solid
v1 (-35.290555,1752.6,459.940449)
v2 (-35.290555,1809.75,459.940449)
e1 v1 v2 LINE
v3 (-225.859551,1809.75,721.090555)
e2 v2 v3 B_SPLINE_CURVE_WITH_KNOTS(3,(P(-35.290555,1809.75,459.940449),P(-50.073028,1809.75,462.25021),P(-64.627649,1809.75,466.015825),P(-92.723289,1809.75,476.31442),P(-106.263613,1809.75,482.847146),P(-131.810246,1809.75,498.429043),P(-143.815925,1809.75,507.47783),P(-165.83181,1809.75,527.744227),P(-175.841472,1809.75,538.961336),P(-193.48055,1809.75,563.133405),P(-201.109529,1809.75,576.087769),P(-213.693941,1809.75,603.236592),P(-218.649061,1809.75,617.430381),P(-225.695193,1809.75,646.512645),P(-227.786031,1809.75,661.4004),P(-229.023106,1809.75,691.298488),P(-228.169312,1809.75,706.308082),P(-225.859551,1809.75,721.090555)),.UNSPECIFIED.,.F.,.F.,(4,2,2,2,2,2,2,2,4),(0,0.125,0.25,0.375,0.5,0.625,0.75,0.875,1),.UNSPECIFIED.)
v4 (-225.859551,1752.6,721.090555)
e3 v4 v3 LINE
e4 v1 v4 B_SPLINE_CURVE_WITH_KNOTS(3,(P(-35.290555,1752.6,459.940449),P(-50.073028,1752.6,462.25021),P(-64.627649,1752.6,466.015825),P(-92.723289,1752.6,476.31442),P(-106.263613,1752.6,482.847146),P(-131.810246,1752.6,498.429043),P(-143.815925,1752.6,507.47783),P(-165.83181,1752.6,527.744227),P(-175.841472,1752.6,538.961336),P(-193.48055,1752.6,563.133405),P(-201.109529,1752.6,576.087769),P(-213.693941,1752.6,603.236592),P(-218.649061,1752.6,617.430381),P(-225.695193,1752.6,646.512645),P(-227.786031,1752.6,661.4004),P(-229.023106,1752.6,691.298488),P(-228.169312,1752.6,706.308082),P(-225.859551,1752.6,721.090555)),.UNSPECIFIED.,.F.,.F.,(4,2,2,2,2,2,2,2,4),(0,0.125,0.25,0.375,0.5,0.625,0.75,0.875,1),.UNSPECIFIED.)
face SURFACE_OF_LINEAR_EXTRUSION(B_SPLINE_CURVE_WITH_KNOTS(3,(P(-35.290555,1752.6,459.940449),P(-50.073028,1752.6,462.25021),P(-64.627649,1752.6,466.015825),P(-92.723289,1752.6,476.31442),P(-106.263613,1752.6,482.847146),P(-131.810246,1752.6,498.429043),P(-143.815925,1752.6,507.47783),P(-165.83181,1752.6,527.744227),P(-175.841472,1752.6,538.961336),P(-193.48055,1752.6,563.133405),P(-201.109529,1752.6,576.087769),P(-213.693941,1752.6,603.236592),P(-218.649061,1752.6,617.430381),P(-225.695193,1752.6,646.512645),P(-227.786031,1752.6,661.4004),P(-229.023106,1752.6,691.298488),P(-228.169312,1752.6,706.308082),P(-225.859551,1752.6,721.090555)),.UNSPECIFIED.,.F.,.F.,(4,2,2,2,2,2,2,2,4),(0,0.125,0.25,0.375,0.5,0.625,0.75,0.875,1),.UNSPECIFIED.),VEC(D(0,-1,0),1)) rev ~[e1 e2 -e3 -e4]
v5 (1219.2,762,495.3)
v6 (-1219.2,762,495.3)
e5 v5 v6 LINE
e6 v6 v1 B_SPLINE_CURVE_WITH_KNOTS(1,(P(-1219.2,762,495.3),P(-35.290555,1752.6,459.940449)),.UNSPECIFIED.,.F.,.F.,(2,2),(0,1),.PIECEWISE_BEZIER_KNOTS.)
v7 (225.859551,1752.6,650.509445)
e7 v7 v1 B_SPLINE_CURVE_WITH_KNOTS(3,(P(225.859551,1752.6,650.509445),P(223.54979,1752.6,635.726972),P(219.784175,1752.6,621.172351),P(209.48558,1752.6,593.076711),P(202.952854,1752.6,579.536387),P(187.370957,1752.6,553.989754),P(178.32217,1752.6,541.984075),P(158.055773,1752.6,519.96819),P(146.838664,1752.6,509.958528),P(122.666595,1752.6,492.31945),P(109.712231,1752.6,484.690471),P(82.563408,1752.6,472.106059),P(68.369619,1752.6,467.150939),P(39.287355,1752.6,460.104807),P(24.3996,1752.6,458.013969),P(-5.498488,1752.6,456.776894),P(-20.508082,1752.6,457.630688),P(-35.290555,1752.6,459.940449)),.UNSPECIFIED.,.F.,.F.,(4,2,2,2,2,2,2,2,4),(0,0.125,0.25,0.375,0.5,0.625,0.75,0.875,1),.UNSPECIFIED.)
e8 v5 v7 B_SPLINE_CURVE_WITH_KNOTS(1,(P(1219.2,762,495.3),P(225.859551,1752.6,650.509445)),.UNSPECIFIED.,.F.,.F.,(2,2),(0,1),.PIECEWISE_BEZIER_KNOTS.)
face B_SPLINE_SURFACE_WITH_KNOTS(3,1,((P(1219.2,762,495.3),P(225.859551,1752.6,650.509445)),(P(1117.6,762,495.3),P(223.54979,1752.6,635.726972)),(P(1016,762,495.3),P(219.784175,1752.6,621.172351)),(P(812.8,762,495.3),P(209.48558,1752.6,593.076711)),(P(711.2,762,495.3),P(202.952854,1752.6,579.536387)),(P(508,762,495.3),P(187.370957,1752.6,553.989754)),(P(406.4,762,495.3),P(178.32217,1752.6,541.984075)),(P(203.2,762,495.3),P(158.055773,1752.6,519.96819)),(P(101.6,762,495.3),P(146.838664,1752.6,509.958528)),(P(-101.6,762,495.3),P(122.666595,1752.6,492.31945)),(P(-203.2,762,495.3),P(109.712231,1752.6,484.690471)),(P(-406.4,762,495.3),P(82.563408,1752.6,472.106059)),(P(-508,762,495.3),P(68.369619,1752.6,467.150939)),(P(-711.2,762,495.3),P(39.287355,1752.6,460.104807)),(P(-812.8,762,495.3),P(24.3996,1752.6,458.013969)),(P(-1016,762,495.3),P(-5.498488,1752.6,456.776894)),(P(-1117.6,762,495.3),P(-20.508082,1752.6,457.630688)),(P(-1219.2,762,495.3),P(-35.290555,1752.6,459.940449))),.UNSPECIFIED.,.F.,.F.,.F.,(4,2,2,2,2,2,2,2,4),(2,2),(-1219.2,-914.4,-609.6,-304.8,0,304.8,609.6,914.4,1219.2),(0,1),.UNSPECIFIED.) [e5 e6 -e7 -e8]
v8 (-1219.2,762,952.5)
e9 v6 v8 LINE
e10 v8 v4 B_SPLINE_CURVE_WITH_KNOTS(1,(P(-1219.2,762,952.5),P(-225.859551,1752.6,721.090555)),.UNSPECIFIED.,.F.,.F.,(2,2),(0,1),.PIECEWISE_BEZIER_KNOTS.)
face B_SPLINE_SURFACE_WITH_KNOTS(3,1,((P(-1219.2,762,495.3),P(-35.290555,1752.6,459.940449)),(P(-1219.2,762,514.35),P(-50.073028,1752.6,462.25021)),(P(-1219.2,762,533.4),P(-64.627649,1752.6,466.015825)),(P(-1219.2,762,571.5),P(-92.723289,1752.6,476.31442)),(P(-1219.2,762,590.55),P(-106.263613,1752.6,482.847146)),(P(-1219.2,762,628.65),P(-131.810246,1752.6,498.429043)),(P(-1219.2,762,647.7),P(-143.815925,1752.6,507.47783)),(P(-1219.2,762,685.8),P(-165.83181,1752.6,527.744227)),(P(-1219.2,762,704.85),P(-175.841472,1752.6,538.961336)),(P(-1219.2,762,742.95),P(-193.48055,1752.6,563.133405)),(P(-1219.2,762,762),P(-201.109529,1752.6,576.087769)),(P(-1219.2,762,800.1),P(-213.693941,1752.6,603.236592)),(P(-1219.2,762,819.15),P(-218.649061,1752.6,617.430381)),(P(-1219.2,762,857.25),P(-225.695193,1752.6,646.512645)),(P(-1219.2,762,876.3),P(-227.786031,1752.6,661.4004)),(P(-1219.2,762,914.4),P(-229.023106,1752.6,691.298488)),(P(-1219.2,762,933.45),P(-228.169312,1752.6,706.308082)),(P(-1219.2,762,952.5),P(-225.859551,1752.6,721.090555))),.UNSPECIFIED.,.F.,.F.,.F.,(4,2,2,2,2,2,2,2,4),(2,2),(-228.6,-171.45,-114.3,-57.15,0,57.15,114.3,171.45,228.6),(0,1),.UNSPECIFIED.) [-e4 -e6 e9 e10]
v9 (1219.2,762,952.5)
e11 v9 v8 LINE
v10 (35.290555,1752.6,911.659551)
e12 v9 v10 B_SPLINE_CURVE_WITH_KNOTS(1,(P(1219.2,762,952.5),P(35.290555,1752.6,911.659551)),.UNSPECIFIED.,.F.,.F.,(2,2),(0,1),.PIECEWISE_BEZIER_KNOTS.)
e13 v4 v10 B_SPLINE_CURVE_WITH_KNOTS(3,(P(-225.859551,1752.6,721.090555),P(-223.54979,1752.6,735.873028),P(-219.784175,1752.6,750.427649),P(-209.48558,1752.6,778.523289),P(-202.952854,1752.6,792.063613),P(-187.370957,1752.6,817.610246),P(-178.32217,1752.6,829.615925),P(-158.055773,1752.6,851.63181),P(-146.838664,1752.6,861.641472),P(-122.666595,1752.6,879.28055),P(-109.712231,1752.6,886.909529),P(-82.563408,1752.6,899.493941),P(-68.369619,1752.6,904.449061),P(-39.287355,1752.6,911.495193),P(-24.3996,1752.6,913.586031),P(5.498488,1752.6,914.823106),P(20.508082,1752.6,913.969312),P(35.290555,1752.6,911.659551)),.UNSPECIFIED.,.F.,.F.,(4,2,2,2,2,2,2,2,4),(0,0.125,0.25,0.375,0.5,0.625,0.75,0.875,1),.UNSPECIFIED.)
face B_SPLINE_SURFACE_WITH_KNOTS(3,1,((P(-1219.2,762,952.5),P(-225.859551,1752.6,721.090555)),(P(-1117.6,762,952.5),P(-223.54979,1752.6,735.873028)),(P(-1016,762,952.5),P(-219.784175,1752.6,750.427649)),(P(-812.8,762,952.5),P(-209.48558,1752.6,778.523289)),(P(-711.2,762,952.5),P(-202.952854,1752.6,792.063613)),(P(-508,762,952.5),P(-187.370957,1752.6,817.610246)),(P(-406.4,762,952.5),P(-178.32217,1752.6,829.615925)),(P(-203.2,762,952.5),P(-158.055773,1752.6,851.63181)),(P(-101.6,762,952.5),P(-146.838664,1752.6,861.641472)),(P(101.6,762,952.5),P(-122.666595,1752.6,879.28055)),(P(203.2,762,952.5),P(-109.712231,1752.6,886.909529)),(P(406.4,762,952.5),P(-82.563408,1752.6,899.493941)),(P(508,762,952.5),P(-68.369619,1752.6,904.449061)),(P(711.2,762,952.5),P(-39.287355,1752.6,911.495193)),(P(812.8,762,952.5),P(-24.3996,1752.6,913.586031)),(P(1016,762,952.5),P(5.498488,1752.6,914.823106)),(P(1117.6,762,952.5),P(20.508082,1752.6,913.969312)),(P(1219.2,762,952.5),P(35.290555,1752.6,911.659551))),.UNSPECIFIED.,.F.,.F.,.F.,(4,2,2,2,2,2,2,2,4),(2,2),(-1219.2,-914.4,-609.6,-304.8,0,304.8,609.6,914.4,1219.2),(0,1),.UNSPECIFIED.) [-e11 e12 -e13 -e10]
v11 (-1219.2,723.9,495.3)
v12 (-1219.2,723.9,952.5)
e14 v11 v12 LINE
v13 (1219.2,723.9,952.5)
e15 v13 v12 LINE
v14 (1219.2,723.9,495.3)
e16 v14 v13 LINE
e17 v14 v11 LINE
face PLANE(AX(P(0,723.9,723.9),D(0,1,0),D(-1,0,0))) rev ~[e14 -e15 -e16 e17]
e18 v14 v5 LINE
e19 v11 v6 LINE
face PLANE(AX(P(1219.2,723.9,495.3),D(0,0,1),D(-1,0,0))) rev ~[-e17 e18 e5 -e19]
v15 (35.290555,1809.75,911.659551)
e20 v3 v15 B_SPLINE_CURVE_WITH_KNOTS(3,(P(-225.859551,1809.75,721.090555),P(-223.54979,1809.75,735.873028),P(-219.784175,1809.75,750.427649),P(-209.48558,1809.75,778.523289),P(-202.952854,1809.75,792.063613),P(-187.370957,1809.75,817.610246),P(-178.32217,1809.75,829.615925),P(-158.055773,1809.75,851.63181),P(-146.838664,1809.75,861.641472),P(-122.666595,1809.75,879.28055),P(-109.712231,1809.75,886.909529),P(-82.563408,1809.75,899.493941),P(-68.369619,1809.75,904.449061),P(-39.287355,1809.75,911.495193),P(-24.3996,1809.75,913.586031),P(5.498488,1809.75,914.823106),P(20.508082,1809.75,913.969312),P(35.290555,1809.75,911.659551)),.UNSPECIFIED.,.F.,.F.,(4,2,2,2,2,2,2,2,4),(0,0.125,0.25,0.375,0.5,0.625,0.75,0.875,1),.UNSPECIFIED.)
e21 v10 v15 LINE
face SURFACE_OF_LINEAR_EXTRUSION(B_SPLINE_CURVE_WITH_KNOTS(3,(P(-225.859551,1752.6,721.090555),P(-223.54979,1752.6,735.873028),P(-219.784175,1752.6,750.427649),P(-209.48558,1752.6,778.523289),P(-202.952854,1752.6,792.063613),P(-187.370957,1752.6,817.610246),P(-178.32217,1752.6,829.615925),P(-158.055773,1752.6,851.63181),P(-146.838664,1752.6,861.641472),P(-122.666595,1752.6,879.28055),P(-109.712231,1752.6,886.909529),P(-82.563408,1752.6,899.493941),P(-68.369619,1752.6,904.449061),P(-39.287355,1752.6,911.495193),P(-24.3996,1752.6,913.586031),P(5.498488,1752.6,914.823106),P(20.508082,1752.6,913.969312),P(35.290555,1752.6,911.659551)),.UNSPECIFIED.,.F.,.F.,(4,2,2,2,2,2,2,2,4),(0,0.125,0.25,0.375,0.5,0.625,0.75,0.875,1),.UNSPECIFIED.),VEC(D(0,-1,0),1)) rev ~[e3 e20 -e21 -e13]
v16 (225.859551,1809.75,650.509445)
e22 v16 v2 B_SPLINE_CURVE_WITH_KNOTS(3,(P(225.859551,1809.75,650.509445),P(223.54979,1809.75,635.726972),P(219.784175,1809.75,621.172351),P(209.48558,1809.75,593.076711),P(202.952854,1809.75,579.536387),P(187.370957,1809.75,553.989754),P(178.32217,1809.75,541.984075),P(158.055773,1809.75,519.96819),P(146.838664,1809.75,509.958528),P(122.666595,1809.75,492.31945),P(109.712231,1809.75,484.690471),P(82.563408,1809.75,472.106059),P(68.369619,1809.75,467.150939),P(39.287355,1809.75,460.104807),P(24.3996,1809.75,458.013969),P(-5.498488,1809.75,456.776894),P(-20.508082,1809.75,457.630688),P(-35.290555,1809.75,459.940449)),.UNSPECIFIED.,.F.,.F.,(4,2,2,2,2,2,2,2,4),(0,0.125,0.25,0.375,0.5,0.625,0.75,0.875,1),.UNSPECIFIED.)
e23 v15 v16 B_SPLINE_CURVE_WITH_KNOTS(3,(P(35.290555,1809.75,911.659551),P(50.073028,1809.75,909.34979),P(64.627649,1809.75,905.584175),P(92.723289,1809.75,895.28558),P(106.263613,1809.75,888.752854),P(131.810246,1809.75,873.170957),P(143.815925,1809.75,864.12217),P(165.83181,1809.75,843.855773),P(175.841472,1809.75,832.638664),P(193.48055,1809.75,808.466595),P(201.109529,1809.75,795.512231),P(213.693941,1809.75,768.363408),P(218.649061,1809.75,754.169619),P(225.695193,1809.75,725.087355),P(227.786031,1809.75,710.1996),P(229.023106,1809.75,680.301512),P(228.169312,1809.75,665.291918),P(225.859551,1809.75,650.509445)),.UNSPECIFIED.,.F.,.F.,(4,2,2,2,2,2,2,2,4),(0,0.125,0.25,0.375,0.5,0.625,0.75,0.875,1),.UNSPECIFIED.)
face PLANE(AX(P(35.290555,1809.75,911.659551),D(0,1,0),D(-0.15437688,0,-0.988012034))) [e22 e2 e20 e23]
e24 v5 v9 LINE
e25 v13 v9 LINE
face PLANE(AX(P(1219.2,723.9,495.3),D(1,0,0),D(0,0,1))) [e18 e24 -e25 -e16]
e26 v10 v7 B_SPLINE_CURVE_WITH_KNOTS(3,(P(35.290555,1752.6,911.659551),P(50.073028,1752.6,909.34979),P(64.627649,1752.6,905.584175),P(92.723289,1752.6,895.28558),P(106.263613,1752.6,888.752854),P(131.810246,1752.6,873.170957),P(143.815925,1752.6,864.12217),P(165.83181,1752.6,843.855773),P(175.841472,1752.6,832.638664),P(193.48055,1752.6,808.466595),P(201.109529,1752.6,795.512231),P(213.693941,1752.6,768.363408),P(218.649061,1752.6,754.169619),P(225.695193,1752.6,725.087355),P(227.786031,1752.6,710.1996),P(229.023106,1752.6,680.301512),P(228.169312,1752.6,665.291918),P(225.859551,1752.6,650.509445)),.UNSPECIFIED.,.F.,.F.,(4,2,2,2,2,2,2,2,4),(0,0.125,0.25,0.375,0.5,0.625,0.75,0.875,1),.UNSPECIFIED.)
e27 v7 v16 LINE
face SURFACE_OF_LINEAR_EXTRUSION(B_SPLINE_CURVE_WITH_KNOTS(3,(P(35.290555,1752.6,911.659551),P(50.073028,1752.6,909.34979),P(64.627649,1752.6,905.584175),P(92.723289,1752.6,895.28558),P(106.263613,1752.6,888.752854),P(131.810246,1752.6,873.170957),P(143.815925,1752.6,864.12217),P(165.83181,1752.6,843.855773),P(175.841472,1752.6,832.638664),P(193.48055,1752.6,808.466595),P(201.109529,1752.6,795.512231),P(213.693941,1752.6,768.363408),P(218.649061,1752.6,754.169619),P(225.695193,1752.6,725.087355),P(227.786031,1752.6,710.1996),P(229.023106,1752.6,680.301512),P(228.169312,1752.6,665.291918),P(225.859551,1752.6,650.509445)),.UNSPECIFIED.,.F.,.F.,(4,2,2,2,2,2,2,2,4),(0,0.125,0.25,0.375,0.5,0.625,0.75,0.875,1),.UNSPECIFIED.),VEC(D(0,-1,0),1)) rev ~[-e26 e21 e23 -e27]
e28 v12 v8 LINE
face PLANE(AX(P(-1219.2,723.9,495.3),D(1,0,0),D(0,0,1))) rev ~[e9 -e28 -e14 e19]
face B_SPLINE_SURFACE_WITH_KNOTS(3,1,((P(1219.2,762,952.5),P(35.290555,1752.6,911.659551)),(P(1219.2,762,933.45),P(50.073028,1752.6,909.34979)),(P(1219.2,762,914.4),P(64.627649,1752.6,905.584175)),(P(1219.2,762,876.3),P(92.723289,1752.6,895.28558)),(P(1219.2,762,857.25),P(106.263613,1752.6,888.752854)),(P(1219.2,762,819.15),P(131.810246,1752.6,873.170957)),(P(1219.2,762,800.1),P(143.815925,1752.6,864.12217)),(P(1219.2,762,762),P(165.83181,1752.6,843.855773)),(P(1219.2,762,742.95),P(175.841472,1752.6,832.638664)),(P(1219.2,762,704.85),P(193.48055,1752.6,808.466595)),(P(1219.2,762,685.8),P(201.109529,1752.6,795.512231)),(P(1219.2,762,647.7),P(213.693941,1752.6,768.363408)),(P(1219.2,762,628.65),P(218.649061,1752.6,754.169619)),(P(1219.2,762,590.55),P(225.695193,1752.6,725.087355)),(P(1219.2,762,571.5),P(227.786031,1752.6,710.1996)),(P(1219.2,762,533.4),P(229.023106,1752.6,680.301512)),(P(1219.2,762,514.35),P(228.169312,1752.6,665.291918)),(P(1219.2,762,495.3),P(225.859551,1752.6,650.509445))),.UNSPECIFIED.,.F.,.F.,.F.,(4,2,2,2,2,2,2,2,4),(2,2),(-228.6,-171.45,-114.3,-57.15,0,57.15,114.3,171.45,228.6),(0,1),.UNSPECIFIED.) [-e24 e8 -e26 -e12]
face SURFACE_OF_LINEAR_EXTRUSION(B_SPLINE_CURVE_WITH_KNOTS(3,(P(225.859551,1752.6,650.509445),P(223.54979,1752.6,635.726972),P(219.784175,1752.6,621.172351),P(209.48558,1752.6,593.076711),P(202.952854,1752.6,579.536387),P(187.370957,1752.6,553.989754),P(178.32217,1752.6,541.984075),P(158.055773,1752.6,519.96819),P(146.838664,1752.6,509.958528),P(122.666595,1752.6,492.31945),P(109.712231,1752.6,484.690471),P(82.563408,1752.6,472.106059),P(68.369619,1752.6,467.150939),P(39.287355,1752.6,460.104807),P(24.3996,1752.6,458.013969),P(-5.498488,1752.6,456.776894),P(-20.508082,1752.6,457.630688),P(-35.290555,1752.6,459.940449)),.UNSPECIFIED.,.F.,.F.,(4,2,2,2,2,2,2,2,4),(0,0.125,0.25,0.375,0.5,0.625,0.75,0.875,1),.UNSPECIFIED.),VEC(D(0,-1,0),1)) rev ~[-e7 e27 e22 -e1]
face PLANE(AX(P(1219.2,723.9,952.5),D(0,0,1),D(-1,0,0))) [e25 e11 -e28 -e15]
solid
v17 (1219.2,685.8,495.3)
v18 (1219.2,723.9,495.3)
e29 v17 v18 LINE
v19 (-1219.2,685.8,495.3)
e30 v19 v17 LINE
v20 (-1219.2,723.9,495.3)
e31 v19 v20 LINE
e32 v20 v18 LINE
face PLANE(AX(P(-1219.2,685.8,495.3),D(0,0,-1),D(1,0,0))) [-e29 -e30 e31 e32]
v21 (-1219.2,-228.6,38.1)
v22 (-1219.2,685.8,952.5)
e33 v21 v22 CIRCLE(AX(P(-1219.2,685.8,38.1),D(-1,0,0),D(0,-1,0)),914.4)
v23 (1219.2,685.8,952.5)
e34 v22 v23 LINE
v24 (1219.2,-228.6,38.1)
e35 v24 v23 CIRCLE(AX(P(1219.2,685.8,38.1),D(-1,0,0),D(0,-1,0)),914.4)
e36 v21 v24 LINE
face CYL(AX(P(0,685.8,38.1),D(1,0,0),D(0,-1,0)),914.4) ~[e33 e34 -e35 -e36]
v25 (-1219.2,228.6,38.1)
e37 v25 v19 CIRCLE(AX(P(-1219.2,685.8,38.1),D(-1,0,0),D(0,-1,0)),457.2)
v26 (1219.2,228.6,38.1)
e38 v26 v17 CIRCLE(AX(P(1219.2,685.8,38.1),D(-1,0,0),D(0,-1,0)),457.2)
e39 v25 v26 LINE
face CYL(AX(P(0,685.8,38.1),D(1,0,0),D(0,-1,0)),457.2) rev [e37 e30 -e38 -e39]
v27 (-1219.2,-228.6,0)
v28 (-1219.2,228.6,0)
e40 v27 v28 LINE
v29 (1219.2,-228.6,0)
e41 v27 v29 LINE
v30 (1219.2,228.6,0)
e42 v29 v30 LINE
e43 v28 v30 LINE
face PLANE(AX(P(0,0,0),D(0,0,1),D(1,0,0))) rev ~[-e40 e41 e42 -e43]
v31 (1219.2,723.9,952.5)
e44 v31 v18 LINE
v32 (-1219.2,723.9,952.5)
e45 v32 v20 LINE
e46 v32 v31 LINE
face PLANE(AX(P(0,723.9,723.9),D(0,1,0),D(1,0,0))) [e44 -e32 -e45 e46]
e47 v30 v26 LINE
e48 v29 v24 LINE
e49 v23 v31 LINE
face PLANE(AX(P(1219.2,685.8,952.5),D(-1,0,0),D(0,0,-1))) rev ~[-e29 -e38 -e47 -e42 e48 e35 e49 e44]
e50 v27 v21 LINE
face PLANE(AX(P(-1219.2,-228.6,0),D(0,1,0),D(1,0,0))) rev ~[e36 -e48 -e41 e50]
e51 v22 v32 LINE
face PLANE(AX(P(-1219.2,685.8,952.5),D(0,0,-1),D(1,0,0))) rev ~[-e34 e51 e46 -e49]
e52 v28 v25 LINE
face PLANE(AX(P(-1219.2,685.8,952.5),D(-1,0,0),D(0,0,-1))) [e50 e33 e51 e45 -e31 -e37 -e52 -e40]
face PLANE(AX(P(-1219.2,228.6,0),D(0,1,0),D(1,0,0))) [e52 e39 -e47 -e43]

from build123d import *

# Parameters (mm, degrees)
F0_W      = 2438.4
F0_H      = 457.2
F1_DEPTH  = 38.1
F2_W      = 2438.4
F2_H      = 457.2
F3_ANGLE  = 90
F4_DEPTH  = 38.1
F5_W      = 2438.4
F5_H      = 457.2
F6_DEPTH  = 38.1
F6_FACE_W = 2438.4
F6_FACE_H = 457.2
F10_DEPTH = 57.15


# Not quite as in the source:
# - the arcs of a loft's sections are written as splines that run evenly, so that the points pair up as in the source's solid


with BuildPart() as f1:
    # F0 (on Top) → F1 (new body)
    with BuildSketch(Plane.XY):
        Rectangle(F0_W, F0_H)
    extrude(amount=F1_DEPTH)

    # F2 (on face) → F3 (revolve)
    with BuildSketch(Plane.XY.offset(38.1)):
        Rectangle(F2_W, F2_H)
    revolve(axis=Axis((-103.2055318356, 685.8, 38.1), (-1, 0, 0)), revolution_arc=F3_ANGLE)

    # F4 (add): a face of the model
    f4_faces = [f1.faces().sort_by_distance(p)[0] for p in [
        (0, 685.8, 723.9),
    ]]
    extrude(f4_faces, amount=F4_DEPTH)


with BuildPart() as f6:
    # F5 (on face) → F6 (new body)
    with BuildSketch(Plane(origin=(0, 723.9, 0), x_dir=(-1, 0, 0), z_dir=(0, 1, 0))):
        with Locations((0, 723.9)):
            Rectangle(F5_W, F5_H)
    extrude(amount=F6_DEPTH)

    # F6_face (on face) → F9 section 0
    with BuildSketch(Plane(origin=(0, 762, 723.9), x_dir=(-1, 0, 0), z_dir=(0, 1, 0))):
        Rectangle(F6_FACE_W, F6_FACE_H)
    # F8 (on offset) → F9 section 1
    with BuildSketch(Plane(origin=(0, 1752.6, 0), x_dir=(-1, 0, 0), z_dir=(0, 1, 0))):
        with BuildLine():
            add(Edge.make_bspline(
                [(-225.8595509155, 650.5094451695), (-223.5497895031, 635.7269721299), (-219.7841746904, 621.1723506338), (-209.4855798503, 593.076710899), (-202.952854476, 579.5363873802), (-187.3709568448, 553.9897536684), (-178.3221698812, 541.9840751662), (-158.0557730466, 519.9681902843), (-146.8386643022, 509.9585282907), (-122.6665945289, 492.3194503481), (-109.7122312021, 484.69047056), (-82.5634075757, 472.1060594298), (-68.3696185843, 467.1509392621), (-39.2873551715, 460.1048068067), (-24.3995998664, 458.0139687485), (5.4984882594, 456.7768938866), (20.508081791, 457.6306876721), (35.2905548305, 459.9404490845)],
                knots=[0, 0, 0, 0, 0.125, 0.125, 0.25, 0.25, 0.375, 0.375, 0.5, 0.5, 0.625, 0.625, 0.75, 0.75, 0.875, 0.875, 1, 1, 1, 1], degree=3))
            add(Edge.make_bspline(
                [(35.2905548305, 459.9404490845), (50.0730278701, 462.2502104969), (64.6276493662, 466.0158253096), (92.723289101, 476.3144201497), (106.2636126198, 482.847145524), (131.8102463316, 498.4290431552), (143.8159248338, 507.4778301188), (165.8318097157, 527.7442269534), (175.8414717093, 538.9613356978), (193.4805496519, 563.1334054711), (201.10952944, 576.0877687979), (213.6939405702, 603.2365924243), (218.6490607379, 617.4303814157), (225.6951931933, 646.5126448285), (227.7860312515, 661.4004001336), (229.0231061134, 691.2984882594), (228.1693123279, 706.308081791), (225.8595509155, 721.0905548305)],
                knots=[0, 0, 0, 0, 0.125, 0.125, 0.25, 0.25, 0.375, 0.375, 0.5, 0.5, 0.625, 0.625, 0.75, 0.75, 0.875, 0.875, 1, 1, 1, 1], degree=3))
            add(Edge.make_bspline(
                [(225.8595509155, 721.0905548305), (223.5497895031, 735.8730278701), (219.7841746904, 750.4276493662), (209.4855798503, 778.523289101), (202.952854476, 792.0636126198), (187.3709568448, 817.6102463316), (178.3221698812, 829.6159248338), (158.0557730466, 851.6318097157), (146.8386643022, 861.6414717093), (122.6665945289, 879.2805496519), (109.7122312021, 886.90952944), (82.5634075757, 899.4939405702), (68.3696185843, 904.4490607379), (39.2873551715, 911.4951931933), (24.3995998664, 913.5860312515), (-5.4984882594, 914.8231061134), (-20.508081791, 913.9693123279), (-35.2905548305, 911.6595509155)],
                knots=[0, 0, 0, 0, 0.125, 0.125, 0.25, 0.25, 0.375, 0.375, 0.5, 0.5, 0.625, 0.625, 0.75, 0.75, 0.875, 0.875, 1, 1, 1, 1], degree=3))
            add(Edge.make_bspline(
                [(-35.2905548305, 911.6595509155), (-50.0730278701, 909.3497895031), (-64.6276493662, 905.5841746904), (-92.723289101, 895.2855798503), (-106.2636126198, 888.752854476), (-131.8102463316, 873.1709568448), (-143.8159248338, 864.1221698812), (-165.8318097157, 843.8557730466), (-175.8414717093, 832.6386643022), (-193.4805496519, 808.4665945289), (-201.10952944, 795.5122312021), (-213.6939405702, 768.3634075757), (-218.6490607379, 754.1696185843), (-225.6951931933, 725.0873551715), (-227.7860312515, 710.1995998664), (-229.0231061134, 680.3015117406), (-228.1693123279, 665.291918209), (-225.8595509155, 650.5094451695)],
                knots=[0, 0, 0, 0, 0.125, 0.125, 0.25, 0.25, 0.375, 0.375, 0.5, 0.5, 0.625, 0.625, 0.75, 0.75, 0.875, 0.875, 1, 1, 1, 1], degree=3))
        make_face()
    loft(ruled=True)

    # F10 (add): a face of the model
    f10_faces = [f6.faces().sort_by_distance(p)[0] for p in [
        (0, 1752.6, 685.8),
    ]]
    extrude(f10_faces, amount=F10_DEPTH)


solid = Compound([f1.part, f6.part])
